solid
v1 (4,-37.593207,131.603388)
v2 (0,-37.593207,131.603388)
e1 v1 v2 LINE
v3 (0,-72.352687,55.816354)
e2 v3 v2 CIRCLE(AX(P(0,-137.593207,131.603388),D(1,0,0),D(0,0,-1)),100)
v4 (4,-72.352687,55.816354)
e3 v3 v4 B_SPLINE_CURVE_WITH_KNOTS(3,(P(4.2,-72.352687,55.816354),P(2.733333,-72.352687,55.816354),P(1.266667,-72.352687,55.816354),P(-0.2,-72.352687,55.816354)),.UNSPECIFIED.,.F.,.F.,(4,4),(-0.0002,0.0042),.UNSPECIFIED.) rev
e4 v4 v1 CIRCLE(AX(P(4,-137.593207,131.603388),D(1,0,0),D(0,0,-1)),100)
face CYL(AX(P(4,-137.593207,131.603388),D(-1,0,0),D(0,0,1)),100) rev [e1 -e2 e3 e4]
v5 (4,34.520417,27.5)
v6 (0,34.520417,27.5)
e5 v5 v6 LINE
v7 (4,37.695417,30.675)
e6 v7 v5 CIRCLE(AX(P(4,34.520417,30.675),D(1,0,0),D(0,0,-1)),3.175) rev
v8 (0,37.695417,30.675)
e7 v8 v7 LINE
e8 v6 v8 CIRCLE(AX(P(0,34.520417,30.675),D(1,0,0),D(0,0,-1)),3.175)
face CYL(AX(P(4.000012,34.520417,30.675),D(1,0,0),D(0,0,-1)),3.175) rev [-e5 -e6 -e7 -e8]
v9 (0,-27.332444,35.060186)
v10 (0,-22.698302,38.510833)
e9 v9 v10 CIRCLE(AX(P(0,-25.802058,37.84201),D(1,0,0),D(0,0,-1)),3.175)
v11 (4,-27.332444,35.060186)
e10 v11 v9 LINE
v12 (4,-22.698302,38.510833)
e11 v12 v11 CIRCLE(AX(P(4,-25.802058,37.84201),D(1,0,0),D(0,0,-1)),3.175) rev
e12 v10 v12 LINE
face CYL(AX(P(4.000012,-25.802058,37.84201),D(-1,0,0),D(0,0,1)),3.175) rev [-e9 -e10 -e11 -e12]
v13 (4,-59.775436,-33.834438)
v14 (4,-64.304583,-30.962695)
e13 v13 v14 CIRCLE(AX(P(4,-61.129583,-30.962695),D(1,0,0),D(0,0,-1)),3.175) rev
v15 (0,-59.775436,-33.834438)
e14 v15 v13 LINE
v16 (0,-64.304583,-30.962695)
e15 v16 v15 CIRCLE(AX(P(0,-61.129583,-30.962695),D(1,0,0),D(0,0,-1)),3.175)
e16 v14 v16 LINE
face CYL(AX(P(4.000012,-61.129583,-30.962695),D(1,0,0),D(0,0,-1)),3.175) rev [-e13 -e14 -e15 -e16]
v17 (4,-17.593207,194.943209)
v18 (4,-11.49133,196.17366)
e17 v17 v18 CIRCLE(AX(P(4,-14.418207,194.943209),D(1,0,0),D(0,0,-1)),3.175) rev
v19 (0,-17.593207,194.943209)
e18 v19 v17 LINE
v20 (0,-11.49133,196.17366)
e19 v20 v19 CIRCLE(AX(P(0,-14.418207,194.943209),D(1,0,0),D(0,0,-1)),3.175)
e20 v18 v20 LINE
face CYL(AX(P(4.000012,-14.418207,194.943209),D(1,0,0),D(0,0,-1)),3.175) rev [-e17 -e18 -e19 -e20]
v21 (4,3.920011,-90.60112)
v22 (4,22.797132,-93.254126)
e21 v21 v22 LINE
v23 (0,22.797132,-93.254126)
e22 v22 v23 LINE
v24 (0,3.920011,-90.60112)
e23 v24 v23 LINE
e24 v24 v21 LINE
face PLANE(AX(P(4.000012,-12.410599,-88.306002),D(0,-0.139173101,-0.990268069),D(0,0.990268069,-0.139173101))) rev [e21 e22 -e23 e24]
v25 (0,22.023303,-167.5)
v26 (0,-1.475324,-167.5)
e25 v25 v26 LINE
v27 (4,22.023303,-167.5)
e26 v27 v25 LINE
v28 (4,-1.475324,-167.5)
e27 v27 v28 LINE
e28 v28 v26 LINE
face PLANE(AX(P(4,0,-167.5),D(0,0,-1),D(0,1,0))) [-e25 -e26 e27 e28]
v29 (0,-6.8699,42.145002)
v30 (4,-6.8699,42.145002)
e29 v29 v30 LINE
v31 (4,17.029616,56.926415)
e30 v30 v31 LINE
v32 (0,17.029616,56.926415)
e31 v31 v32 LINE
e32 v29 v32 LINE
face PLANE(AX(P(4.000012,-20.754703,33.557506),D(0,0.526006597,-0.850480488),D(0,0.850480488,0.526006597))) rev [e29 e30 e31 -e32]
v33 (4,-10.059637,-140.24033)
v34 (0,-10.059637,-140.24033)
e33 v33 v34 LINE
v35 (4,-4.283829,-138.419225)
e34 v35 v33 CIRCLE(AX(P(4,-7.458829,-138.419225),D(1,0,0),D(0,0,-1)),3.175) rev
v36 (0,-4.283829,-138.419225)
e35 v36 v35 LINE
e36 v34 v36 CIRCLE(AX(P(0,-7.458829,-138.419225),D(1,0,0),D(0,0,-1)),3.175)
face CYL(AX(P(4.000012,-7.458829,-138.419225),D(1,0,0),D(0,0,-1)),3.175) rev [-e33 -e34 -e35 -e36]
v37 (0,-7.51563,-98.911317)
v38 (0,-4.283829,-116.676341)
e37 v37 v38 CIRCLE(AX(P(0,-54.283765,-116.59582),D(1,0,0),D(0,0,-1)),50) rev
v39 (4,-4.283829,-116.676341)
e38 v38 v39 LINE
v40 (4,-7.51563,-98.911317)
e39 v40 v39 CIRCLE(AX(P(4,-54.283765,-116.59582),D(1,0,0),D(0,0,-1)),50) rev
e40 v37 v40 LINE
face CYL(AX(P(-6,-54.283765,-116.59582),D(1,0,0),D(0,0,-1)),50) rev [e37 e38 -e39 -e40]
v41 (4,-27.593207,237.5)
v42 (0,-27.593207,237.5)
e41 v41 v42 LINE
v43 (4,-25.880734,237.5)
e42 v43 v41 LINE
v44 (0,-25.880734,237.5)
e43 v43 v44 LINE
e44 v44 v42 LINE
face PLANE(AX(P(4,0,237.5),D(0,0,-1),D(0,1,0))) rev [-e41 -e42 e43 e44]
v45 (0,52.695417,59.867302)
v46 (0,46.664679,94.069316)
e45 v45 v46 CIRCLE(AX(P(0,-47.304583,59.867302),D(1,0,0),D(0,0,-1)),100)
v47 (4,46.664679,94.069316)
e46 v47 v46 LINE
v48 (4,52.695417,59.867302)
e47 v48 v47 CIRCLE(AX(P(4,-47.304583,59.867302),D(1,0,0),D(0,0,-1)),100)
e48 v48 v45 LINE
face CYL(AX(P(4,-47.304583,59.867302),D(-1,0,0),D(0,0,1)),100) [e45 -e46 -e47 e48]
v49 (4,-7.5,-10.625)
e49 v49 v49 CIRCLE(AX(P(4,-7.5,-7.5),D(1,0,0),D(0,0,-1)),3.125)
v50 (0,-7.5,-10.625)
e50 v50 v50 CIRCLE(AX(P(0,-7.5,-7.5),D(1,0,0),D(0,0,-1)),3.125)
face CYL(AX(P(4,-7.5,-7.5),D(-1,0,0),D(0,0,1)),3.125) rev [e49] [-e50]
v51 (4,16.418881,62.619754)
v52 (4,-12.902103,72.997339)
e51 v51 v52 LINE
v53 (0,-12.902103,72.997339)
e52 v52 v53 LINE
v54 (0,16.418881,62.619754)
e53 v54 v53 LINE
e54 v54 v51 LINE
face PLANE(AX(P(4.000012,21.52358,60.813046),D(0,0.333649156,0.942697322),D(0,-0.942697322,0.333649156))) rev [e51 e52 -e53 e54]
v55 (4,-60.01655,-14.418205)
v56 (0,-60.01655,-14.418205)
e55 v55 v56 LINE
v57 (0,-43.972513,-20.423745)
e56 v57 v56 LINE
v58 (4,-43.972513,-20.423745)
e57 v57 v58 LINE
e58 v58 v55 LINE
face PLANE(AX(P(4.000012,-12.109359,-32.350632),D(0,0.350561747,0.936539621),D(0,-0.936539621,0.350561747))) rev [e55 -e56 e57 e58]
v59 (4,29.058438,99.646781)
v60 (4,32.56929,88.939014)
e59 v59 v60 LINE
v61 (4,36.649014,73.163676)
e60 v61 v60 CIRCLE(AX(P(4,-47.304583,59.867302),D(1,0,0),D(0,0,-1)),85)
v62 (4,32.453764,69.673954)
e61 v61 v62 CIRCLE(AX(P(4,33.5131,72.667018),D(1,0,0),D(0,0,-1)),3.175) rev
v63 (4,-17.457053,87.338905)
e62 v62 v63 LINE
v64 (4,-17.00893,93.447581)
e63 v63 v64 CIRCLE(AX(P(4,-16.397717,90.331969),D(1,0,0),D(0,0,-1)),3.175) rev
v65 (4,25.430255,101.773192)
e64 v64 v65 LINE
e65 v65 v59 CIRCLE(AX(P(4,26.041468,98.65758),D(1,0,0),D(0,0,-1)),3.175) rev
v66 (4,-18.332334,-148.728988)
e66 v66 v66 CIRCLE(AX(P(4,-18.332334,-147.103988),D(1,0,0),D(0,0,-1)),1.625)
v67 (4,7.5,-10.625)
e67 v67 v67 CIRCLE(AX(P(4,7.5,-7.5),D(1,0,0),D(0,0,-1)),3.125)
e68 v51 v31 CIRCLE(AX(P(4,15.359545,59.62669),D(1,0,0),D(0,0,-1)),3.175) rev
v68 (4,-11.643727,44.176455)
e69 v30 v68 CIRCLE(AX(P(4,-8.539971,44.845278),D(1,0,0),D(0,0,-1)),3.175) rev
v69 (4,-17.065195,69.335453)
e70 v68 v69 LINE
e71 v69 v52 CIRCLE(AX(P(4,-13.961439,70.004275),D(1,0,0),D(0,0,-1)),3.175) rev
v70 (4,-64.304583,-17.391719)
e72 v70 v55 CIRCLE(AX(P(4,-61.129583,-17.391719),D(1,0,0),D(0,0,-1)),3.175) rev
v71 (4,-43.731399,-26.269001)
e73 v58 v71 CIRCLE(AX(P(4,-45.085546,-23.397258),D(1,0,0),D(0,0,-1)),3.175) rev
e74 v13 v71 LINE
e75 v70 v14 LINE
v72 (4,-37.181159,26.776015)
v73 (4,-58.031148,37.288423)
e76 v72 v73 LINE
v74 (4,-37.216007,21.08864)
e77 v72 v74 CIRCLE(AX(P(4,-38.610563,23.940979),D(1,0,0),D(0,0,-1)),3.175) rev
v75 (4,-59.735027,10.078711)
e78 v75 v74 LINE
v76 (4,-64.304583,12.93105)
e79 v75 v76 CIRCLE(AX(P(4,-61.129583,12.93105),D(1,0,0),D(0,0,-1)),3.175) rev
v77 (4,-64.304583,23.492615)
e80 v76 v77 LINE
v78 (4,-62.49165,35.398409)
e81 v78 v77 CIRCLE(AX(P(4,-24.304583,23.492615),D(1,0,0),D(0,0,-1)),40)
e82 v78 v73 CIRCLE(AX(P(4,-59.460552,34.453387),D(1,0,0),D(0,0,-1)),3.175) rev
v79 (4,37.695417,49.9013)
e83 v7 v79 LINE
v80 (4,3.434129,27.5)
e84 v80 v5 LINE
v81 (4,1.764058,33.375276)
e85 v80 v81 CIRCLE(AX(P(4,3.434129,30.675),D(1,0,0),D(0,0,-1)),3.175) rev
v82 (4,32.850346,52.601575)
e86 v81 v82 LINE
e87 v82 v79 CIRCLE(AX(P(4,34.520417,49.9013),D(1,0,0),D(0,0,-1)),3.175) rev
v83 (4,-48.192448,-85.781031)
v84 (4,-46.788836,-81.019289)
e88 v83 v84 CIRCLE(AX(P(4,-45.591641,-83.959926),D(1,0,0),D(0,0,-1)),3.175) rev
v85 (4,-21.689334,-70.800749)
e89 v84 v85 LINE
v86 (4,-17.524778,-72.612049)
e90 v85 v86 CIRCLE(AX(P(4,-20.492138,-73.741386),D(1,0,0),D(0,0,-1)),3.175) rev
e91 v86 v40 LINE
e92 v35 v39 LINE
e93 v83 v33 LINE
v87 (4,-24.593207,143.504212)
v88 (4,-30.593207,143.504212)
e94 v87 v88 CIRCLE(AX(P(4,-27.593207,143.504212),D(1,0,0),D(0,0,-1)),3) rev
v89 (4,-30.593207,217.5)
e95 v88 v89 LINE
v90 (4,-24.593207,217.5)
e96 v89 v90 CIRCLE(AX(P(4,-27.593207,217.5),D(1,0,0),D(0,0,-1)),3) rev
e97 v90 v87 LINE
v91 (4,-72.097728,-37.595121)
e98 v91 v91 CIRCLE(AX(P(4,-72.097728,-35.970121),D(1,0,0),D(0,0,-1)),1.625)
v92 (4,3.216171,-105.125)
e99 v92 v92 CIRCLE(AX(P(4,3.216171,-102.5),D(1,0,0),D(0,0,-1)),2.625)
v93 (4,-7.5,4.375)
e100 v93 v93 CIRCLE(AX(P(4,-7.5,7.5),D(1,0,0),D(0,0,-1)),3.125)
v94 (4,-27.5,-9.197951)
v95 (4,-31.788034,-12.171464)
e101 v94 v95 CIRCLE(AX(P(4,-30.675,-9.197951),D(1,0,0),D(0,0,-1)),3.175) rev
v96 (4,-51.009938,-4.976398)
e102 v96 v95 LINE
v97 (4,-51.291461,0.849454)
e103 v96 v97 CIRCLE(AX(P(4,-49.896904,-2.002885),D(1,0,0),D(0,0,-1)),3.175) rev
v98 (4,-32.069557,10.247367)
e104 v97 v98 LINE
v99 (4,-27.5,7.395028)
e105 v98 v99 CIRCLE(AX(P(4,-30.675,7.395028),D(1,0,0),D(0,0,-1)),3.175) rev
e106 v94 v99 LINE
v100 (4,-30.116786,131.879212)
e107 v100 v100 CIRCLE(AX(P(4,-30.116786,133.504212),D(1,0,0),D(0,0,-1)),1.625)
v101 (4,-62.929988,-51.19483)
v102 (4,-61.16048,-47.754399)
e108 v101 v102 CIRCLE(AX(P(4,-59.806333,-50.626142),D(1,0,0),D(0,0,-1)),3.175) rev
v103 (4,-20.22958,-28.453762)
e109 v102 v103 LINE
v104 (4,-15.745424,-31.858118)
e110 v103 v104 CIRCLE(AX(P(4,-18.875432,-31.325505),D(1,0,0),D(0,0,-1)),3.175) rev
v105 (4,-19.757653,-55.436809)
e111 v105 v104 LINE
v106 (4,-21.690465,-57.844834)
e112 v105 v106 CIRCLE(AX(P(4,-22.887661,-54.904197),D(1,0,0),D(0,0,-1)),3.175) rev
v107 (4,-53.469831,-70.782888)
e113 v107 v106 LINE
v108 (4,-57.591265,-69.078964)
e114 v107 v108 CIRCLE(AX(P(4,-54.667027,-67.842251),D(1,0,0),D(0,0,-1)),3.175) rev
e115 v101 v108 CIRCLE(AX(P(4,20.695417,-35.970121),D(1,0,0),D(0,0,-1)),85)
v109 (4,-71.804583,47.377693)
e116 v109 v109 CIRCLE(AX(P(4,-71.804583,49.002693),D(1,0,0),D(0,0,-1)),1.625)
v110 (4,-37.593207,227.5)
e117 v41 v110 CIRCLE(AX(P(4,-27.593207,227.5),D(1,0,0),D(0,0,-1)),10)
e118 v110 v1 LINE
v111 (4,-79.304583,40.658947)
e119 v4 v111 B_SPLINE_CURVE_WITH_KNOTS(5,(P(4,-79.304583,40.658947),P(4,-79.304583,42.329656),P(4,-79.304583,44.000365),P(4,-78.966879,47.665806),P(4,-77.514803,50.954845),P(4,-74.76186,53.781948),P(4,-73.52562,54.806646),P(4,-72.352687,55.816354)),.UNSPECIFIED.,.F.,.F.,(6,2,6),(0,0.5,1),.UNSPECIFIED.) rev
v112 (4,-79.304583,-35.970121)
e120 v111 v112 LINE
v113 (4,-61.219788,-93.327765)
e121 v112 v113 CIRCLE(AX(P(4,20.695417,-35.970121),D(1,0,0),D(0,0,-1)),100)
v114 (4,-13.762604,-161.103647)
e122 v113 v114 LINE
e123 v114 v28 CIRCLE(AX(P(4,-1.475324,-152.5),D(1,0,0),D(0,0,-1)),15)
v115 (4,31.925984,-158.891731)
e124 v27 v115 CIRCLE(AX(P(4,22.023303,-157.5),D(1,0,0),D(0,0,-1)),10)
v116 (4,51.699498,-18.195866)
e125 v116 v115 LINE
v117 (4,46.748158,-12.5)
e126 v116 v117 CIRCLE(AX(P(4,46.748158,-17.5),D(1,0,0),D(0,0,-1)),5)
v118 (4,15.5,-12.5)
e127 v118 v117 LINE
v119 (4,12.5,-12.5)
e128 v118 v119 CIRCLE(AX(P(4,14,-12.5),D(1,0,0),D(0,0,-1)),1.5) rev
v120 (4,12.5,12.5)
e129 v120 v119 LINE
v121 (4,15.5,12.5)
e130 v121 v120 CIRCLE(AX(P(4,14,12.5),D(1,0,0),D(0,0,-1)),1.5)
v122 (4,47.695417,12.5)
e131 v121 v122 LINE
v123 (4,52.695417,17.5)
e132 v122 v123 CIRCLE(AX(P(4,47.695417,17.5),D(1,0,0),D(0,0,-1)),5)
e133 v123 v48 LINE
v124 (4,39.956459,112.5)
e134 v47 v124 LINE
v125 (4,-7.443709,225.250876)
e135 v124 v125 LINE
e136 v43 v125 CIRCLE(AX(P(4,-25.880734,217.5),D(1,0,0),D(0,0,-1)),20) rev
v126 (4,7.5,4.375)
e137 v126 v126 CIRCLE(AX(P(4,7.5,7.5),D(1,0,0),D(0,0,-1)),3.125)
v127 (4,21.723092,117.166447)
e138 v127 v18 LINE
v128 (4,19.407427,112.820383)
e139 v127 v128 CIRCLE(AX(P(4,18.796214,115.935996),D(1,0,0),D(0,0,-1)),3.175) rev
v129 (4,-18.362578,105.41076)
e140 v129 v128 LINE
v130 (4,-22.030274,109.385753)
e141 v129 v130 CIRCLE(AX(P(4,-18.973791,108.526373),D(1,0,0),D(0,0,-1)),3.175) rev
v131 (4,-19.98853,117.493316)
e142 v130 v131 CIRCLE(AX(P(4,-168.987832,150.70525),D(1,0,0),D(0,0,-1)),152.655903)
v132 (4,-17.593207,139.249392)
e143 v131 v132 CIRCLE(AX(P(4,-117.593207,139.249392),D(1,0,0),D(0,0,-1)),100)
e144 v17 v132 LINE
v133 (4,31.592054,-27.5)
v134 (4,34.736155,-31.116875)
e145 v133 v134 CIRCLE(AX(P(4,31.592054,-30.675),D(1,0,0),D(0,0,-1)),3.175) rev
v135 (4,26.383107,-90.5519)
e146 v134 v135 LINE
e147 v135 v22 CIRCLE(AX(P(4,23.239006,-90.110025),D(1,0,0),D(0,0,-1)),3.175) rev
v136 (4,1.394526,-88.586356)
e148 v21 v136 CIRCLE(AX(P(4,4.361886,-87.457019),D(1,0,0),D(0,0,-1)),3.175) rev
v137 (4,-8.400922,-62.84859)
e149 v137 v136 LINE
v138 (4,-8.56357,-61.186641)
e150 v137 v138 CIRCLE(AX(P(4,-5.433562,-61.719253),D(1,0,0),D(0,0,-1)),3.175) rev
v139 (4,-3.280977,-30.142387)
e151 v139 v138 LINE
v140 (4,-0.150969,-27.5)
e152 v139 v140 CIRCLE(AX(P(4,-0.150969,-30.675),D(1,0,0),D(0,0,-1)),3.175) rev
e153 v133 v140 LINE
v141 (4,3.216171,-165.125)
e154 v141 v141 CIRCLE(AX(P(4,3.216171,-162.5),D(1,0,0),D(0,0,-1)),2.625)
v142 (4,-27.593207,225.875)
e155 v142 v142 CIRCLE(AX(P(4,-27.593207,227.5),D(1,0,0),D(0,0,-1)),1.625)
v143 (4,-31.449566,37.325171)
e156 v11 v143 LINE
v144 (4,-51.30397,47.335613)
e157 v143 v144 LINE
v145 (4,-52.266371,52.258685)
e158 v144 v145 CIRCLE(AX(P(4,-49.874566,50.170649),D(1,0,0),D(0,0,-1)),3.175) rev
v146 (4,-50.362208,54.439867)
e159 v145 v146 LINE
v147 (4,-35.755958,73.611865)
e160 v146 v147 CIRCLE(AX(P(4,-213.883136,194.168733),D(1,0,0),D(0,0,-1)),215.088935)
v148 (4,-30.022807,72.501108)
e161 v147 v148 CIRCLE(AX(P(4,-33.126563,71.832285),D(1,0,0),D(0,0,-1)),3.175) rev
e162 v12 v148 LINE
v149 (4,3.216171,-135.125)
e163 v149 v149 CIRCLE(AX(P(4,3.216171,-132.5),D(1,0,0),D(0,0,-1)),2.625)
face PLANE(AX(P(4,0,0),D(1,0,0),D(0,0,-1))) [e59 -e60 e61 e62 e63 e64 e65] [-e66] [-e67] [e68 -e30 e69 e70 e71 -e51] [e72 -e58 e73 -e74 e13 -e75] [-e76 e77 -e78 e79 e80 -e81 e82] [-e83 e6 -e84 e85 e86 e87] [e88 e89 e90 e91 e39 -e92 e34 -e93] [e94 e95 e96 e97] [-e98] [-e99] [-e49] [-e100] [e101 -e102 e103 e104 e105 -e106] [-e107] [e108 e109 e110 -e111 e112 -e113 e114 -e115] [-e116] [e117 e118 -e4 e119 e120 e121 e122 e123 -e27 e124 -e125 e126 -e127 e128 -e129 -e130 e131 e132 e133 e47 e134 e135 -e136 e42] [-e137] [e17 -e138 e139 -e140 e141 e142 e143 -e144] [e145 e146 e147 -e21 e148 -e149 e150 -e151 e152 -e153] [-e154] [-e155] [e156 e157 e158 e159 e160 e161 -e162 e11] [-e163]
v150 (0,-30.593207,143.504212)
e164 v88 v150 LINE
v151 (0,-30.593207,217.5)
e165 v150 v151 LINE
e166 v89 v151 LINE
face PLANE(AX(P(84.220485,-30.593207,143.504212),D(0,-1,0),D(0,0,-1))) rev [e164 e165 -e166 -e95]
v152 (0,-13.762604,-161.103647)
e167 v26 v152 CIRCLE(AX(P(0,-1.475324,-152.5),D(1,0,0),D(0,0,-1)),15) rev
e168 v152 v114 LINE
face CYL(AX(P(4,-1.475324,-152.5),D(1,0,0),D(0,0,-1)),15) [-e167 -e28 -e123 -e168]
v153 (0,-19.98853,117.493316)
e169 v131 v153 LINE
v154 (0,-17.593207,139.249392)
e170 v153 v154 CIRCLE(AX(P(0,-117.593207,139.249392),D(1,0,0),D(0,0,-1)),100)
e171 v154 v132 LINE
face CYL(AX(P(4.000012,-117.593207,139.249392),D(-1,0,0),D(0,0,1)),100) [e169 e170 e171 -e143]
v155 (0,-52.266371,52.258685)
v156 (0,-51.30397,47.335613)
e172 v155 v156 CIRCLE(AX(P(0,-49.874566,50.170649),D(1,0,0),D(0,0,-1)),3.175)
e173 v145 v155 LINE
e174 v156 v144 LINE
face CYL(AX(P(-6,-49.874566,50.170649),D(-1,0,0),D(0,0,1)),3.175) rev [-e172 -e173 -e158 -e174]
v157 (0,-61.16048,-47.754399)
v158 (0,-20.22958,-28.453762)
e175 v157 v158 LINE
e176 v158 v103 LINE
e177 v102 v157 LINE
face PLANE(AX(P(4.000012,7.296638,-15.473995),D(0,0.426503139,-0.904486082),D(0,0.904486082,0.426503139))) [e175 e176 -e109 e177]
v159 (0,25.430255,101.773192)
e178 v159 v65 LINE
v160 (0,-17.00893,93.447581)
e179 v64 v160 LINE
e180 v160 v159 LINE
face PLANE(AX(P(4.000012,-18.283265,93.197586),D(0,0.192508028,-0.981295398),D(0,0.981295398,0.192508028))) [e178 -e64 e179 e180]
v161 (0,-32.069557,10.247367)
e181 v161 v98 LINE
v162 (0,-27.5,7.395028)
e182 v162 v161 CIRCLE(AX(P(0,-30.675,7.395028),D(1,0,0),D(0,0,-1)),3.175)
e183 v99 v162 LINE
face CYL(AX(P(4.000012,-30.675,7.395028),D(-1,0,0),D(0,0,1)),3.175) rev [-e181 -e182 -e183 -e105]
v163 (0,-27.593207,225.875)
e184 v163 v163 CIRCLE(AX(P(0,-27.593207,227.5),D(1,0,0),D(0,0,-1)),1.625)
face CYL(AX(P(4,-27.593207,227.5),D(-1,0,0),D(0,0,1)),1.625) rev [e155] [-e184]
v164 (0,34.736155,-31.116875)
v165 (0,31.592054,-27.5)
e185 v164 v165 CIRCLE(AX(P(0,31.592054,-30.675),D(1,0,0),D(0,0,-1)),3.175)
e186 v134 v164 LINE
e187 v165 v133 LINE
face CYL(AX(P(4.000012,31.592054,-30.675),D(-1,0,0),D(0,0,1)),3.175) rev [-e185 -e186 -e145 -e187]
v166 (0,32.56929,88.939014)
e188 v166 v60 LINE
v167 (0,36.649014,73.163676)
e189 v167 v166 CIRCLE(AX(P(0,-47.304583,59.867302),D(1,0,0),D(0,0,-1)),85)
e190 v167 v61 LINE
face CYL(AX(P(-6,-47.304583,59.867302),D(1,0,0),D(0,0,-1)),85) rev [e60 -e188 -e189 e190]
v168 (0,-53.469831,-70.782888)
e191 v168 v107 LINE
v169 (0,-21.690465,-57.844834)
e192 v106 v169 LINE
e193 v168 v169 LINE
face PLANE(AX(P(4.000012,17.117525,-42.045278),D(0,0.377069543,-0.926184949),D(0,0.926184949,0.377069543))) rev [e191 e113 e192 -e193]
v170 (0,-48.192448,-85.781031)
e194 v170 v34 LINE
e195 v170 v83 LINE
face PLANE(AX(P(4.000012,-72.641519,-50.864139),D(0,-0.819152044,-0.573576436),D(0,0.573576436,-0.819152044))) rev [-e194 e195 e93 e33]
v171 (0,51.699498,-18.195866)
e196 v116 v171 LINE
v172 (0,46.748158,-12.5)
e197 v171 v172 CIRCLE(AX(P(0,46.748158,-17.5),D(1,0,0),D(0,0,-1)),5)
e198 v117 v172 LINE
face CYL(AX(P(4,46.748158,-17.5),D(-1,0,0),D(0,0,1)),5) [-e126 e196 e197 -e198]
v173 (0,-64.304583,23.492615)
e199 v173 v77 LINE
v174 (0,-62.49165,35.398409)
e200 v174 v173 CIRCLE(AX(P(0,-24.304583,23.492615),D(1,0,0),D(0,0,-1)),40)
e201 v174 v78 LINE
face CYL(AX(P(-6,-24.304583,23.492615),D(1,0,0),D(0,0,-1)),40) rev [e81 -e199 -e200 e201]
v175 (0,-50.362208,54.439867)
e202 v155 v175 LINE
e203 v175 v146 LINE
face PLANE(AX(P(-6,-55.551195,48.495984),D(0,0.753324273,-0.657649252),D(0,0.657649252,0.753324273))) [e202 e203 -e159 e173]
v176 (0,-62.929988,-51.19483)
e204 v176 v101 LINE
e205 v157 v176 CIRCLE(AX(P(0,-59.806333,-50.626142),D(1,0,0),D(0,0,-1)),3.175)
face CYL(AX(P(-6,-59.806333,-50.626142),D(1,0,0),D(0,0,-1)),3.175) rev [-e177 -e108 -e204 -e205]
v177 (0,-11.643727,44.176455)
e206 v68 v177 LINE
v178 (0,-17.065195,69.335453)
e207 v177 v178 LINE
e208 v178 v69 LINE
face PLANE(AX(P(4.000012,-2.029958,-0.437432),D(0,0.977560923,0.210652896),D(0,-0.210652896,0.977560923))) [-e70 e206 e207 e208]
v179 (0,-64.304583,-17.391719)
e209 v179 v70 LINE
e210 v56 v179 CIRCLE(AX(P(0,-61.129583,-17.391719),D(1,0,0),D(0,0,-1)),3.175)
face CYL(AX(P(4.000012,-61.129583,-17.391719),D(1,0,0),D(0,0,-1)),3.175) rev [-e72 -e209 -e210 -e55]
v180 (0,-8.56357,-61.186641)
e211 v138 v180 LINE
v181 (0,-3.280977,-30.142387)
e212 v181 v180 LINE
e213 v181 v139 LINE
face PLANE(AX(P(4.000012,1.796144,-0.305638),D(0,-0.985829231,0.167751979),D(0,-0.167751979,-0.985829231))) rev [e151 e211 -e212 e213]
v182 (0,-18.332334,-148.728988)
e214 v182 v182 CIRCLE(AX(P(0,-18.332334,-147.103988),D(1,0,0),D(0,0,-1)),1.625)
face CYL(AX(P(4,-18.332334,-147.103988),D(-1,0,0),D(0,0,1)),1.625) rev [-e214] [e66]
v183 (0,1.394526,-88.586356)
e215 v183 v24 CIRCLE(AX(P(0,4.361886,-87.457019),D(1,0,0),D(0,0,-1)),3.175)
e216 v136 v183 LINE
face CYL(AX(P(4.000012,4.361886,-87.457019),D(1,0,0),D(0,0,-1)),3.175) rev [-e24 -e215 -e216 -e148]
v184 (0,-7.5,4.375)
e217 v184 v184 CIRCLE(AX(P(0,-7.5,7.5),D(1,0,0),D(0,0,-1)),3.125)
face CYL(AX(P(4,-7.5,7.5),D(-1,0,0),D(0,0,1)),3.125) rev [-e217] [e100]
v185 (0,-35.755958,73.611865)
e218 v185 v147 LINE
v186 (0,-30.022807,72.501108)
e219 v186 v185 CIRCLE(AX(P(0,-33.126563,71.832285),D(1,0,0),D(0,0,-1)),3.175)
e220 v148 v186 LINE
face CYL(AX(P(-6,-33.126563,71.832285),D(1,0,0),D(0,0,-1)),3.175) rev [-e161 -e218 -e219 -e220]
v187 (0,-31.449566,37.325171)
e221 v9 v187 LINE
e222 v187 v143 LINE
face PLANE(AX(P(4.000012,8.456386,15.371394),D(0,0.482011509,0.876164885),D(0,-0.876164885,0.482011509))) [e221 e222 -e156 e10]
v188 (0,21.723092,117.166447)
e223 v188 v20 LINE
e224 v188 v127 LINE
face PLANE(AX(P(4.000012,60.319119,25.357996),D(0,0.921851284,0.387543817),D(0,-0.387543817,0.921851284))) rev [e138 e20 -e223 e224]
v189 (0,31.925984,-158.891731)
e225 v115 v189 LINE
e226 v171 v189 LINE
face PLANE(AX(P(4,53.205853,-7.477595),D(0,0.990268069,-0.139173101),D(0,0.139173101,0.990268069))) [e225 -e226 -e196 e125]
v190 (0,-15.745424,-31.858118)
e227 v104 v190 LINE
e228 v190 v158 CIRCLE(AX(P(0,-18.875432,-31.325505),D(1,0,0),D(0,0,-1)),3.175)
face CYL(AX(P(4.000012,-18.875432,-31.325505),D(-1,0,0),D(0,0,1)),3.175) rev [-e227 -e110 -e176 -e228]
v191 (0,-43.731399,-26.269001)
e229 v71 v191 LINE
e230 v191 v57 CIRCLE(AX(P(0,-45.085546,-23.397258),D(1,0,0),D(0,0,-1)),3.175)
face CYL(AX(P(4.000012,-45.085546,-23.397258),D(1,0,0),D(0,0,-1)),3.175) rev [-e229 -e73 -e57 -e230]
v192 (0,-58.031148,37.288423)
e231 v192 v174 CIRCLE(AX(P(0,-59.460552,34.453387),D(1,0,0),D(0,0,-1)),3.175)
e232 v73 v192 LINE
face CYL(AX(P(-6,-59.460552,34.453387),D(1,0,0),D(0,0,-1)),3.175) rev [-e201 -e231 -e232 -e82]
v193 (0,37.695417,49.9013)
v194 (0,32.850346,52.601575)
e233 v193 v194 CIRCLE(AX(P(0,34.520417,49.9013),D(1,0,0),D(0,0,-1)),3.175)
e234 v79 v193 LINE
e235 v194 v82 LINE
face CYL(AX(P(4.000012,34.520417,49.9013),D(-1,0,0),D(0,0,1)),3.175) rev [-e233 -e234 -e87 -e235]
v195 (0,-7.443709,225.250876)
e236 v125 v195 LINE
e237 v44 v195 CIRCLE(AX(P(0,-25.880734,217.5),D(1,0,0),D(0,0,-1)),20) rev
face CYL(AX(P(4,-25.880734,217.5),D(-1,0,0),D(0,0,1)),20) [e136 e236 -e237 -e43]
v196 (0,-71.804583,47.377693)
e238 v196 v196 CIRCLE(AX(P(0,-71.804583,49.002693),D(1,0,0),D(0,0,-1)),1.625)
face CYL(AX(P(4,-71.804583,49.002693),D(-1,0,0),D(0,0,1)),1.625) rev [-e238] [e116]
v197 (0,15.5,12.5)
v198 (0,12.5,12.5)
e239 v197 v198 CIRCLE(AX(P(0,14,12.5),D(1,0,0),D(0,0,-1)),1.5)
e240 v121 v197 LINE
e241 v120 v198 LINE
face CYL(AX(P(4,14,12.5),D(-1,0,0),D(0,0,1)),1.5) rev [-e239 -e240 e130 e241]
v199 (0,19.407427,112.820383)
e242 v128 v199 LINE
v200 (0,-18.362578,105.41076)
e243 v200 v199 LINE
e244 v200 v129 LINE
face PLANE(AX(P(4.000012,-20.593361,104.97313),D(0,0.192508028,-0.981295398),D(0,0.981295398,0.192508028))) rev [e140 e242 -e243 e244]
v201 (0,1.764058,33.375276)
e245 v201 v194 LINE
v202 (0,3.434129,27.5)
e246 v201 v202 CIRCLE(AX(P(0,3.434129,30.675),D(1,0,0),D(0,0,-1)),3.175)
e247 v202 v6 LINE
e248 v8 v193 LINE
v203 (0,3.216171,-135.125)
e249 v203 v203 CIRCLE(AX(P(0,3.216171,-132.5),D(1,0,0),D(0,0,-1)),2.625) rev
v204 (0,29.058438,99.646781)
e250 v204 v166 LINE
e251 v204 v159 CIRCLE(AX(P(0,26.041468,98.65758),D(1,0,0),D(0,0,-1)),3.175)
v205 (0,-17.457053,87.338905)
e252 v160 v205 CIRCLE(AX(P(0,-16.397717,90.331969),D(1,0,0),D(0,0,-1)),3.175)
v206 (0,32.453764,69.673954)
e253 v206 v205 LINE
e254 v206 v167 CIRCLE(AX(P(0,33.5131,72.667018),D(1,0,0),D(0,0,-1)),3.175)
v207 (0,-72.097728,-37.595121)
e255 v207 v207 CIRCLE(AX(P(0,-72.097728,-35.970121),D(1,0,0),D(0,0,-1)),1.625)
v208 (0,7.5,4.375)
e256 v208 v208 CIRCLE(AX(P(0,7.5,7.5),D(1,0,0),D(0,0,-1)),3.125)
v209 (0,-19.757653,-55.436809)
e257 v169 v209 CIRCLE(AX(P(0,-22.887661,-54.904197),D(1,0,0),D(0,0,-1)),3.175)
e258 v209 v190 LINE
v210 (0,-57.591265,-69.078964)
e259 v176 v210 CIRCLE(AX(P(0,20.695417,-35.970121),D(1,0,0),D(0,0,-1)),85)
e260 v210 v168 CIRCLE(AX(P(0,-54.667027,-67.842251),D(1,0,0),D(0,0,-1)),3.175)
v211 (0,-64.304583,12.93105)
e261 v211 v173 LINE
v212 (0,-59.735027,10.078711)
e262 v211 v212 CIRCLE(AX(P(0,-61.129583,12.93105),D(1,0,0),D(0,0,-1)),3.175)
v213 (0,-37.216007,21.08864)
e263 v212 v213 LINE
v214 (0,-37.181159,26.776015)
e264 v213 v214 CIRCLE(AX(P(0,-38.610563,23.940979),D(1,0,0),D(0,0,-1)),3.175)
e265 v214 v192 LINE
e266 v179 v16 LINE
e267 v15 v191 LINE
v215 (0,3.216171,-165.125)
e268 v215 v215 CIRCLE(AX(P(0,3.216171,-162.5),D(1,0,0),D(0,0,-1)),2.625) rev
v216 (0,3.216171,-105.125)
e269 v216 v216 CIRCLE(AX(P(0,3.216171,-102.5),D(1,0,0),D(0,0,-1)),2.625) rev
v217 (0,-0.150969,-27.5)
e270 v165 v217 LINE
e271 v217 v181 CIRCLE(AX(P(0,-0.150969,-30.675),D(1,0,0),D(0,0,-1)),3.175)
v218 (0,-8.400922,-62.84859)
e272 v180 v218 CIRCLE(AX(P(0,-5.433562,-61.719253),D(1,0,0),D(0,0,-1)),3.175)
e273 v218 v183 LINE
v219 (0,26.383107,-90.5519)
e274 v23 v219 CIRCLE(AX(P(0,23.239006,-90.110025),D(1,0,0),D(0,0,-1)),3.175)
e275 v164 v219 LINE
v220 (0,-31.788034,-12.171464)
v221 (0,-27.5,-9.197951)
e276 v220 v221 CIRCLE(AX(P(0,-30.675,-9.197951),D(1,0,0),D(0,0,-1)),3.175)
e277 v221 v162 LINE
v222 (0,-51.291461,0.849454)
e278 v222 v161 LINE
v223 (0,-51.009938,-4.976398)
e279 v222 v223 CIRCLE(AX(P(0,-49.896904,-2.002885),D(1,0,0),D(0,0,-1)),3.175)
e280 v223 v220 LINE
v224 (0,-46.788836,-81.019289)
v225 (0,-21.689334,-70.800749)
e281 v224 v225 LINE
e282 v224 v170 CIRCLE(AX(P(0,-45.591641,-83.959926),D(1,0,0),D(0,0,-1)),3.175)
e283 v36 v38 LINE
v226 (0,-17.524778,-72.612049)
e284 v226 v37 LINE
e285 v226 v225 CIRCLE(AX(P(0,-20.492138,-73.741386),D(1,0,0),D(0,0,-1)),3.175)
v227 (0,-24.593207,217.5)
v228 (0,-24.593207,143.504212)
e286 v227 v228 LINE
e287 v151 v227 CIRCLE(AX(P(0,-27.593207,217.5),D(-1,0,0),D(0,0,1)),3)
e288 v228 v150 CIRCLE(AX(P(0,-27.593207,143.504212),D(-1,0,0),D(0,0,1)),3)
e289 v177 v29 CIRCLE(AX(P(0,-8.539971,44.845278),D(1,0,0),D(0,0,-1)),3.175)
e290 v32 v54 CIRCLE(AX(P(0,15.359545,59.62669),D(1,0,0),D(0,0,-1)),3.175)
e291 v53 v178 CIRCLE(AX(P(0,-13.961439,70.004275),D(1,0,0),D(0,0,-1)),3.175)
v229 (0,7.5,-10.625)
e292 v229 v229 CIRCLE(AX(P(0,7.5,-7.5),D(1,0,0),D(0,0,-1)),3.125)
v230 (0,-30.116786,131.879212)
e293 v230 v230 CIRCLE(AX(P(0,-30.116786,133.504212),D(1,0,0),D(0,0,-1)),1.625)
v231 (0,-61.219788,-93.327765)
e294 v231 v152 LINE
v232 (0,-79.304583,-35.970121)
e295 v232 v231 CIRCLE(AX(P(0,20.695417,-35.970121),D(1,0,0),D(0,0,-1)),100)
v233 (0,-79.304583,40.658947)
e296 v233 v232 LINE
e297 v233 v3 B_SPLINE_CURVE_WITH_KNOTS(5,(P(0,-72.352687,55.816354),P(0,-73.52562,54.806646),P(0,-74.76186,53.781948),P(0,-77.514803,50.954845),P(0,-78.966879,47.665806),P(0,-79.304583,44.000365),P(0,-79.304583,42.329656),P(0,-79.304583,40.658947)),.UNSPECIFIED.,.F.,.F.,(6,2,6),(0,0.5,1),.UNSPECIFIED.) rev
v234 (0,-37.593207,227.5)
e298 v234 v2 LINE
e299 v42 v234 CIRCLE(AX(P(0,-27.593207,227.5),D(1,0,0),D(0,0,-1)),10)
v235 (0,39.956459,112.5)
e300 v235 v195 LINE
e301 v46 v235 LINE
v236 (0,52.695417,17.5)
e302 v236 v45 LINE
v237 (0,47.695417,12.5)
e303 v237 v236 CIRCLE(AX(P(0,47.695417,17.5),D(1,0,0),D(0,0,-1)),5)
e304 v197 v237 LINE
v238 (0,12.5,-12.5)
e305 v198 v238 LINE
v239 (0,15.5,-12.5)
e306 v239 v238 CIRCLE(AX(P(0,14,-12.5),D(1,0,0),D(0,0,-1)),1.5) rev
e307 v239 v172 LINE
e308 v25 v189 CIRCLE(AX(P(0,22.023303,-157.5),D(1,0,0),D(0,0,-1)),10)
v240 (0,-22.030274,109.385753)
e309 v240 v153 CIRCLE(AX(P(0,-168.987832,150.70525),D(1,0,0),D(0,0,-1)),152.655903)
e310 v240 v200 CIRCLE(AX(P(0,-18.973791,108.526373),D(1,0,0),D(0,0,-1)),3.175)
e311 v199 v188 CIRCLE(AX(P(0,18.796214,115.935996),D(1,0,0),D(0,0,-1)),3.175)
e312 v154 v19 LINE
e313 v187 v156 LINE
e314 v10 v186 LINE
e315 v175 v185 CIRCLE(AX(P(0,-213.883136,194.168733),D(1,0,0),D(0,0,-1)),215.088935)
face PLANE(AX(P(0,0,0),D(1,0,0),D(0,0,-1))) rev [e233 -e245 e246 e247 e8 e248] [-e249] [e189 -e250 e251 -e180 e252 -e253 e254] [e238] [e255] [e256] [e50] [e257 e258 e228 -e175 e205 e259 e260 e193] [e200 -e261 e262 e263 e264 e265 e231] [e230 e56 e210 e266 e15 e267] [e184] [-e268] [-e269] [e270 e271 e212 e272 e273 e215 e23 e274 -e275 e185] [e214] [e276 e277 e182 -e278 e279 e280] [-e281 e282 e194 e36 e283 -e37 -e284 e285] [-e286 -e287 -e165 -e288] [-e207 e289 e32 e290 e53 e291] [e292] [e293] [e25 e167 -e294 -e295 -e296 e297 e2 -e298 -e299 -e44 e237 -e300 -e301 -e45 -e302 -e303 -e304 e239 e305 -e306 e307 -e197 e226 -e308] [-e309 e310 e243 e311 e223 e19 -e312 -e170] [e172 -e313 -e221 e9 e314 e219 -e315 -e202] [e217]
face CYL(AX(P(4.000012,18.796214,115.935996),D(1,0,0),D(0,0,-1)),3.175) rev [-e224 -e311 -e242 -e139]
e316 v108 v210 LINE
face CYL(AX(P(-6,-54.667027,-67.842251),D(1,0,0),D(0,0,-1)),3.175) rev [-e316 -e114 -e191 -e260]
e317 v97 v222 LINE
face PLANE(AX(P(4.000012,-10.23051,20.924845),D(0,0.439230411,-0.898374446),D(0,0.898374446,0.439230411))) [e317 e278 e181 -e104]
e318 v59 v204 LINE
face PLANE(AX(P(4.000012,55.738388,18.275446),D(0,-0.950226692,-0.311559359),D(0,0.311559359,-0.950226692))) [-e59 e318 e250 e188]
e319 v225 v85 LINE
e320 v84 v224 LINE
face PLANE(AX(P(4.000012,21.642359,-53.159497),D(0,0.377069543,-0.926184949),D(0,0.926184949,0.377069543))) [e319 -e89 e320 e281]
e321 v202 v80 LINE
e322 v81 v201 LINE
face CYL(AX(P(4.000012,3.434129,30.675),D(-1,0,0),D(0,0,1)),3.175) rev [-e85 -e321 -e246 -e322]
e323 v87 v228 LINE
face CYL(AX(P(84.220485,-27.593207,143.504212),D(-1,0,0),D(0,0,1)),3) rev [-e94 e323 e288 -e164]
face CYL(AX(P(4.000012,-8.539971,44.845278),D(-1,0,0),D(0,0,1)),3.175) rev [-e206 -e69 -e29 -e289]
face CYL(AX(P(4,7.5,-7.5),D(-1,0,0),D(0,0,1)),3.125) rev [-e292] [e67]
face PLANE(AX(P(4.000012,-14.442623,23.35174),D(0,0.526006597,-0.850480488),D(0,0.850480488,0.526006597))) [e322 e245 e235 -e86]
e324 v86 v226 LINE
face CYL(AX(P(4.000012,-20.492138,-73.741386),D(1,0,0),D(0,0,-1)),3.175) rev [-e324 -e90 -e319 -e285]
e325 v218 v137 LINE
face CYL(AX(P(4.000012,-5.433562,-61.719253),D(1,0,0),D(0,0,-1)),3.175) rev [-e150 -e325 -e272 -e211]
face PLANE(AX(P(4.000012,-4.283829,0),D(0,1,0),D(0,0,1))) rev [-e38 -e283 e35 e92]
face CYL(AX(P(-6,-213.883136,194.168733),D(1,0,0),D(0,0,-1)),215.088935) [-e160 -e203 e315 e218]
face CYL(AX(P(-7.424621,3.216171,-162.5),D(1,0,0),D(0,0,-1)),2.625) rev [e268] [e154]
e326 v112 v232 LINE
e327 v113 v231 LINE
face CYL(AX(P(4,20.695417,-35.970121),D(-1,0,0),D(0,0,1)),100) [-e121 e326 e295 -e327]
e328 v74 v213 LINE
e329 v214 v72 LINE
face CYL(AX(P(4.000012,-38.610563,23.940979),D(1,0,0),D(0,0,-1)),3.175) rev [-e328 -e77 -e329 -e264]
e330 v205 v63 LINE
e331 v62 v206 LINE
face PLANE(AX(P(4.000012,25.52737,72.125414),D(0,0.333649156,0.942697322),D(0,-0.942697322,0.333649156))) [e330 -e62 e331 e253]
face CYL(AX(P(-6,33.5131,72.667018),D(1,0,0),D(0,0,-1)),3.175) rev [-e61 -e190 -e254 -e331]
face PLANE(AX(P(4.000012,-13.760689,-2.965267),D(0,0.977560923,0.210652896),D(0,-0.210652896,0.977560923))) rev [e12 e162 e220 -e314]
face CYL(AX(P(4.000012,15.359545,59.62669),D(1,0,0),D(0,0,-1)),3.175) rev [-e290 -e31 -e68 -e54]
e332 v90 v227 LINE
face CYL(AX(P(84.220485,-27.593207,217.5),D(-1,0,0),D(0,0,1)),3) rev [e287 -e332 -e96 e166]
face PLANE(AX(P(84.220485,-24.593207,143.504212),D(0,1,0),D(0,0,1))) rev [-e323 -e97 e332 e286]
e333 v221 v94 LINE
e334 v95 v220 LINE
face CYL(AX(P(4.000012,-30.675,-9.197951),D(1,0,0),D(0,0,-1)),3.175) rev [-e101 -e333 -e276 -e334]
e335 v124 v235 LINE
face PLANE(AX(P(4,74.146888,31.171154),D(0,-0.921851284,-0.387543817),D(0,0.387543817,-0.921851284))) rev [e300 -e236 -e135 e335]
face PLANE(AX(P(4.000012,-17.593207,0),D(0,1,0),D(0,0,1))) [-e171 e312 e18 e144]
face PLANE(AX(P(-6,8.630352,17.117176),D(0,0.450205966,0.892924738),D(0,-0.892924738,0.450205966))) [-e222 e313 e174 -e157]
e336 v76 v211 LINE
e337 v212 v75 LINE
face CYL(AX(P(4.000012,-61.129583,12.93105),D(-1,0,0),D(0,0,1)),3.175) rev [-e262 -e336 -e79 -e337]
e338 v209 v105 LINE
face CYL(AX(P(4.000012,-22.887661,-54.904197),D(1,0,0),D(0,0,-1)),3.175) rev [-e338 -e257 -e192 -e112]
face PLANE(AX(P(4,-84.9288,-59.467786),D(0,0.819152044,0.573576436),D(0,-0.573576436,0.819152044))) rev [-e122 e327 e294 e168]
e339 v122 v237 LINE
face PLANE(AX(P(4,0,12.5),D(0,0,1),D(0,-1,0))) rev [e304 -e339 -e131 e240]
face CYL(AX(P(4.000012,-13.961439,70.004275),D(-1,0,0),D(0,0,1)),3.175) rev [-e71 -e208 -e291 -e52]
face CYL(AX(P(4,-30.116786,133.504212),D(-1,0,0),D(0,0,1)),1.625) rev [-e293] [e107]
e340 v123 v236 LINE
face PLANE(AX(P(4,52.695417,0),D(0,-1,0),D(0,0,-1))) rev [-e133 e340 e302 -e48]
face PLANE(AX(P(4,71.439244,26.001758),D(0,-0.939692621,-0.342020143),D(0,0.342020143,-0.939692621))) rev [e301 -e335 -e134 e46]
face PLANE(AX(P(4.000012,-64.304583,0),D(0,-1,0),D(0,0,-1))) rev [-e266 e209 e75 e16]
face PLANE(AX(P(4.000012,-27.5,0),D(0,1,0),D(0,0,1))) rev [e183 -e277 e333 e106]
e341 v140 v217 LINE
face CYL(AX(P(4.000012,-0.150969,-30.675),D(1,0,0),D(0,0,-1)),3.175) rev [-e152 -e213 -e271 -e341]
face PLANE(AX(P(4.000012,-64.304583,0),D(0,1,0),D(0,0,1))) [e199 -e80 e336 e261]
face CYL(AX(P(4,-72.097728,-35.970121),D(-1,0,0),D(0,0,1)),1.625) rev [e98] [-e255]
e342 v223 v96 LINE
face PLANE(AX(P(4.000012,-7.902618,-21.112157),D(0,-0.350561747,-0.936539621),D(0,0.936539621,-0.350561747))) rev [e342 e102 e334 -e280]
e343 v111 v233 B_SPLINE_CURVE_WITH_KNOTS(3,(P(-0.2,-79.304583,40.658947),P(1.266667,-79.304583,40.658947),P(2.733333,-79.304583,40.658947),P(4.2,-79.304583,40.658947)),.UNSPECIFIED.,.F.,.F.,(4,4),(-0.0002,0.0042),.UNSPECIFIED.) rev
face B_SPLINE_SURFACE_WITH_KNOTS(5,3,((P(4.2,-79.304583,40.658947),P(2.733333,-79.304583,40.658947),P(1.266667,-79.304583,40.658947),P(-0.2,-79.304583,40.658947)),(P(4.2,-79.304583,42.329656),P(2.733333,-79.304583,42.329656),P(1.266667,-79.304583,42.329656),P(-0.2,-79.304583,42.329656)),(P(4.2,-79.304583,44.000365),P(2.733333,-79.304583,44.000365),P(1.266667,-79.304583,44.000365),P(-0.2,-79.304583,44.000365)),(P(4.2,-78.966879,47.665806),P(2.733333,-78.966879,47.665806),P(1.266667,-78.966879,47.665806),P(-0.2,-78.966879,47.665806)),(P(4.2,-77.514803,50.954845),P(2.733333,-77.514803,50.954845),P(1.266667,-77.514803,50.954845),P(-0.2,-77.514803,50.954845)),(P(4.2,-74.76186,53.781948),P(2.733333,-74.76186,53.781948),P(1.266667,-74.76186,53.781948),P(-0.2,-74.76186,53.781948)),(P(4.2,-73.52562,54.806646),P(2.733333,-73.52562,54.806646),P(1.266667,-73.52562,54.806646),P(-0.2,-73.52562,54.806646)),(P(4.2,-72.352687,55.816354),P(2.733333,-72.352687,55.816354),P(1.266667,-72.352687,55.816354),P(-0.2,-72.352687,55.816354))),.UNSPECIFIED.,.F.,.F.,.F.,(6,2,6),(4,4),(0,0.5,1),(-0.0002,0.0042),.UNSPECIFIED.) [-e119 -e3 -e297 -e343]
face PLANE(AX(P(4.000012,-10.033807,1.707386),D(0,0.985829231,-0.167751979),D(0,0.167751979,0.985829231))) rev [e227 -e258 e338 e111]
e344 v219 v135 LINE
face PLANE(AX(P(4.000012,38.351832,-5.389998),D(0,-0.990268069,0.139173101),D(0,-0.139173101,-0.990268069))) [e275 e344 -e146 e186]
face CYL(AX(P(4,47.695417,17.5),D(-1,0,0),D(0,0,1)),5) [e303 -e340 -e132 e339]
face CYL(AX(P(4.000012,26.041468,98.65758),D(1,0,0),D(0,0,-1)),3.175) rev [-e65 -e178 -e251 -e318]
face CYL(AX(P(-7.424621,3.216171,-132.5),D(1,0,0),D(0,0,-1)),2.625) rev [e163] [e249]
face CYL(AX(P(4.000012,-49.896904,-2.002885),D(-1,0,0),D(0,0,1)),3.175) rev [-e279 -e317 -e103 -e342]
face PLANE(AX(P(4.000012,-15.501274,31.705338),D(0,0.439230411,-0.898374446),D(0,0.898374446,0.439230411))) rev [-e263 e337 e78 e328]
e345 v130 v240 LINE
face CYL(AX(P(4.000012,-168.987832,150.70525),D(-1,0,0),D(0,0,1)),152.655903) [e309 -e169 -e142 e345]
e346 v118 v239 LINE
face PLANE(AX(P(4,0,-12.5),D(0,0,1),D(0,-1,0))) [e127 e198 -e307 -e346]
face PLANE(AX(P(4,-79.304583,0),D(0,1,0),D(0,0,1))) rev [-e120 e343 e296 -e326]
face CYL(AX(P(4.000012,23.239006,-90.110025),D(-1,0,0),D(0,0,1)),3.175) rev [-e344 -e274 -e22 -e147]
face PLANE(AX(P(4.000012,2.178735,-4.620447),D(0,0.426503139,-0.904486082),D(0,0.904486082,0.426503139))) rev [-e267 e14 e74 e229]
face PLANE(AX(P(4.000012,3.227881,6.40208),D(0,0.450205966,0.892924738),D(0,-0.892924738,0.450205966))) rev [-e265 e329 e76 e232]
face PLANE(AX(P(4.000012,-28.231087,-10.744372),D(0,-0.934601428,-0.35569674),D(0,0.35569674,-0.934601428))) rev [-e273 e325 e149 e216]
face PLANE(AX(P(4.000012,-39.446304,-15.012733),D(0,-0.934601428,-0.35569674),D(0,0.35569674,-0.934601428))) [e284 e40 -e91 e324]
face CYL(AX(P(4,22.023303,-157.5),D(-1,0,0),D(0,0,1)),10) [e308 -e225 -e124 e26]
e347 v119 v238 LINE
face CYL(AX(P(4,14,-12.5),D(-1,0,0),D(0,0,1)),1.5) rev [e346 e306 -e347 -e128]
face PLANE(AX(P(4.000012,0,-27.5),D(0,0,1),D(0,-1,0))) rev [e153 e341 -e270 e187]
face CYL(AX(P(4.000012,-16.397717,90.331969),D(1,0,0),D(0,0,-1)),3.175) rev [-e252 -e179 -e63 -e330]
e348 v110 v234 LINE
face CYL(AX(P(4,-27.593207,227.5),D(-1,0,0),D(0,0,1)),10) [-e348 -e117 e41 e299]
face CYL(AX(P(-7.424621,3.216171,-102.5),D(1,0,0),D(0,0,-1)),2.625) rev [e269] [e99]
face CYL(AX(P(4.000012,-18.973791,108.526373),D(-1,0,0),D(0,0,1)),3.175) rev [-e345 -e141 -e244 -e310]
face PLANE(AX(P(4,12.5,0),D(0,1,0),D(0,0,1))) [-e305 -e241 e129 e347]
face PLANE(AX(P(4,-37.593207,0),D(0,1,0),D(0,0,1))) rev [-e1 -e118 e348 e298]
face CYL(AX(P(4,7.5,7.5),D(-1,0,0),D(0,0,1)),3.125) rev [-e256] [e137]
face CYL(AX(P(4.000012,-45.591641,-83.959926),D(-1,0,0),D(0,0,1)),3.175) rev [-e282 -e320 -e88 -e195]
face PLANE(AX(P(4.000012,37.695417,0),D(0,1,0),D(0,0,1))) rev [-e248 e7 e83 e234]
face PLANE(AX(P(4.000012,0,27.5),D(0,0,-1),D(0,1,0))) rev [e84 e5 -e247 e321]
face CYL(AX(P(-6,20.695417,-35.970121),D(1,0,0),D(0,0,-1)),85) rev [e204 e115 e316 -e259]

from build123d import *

# Parameters (mm, degrees)
SKETCH2_R               = 3.125
SKETCH2_R_2             = 1.625
BOSS_EXTRUDE1_DEPTH     = 4
SKETCH4_R               = 2.625
CUT_EXTRUDE1_DEPTH      = 4
CUT_EXTRUDE2_DEPTH      = 4
CUT_EXTRUDE3_DEPTH      = 251.422576691
CUT_EXTRUDE3_DEPTH_BACK = 10
FILLET1_START           = -1
FILLET1_DEPTH           = 6
FILLET2_R               = 15
FILLET3_R               = 3.175


with BuildPart() as part:
    # Sketch2 → Boss-Extrude1 (new body)
    with BuildSketch(Plane(origin=(0, 0, 0), x_dir=(0, 0, -1), z_dir=(1, 0, 0))):
        with BuildLine():
            Line((-12.5, 12.5), (12.5, 12.5))
            ThreePointArc((12.5, 12.5), (14, 14), (12.5, 15.5))
            Line((12.5, 15.5), (12.5, 46.748157964))
            ThreePointArc((12.5, 46.748157964), (14.219704855, 50.521705865), (18.195865505, 51.699498308))
            Line((18.195865505, 51.699498308), (158.89173101, 31.92598393))
            ThreePointArc((158.89173101, 31.92598393), (165.047095802, 28.583893533), (167.5, 22.023303243))
            Line((167.5, 22.023303243), (167.5, -9.283829379))
            Line((167.5, -9.283829379), (93.327764747, -61.219787629))
            ThreePointArc((93.327764747, -61.219787629), (66.040701063, -74.676278275), (35.970121112, -79.3045832))
            Line((35.970121112, -79.3045832), (-50.348010792, -79.3045832))
            ThreePointArc((-50.348010792, -79.3045832), (-85.935359672, -48.630118411), (-131.603387734, -37.593207459))
            Line((-131.603387734, -37.593207459), (-227.5, -37.593207459))
            ThreePointArc((-227.5, -37.593207459), (-234.571067812, -34.664275271), (-237.5, -27.593207459))
            Line((-237.5, -27.593207459), (-237.5, -25.880734277))
            ThreePointArc((-237.5, -25.880734277), (-234.158594281, -14.813158364), (-225.250876341, -7.443708597))
            Line((-225.250876341, -7.443708597), (-112.5, 39.956458601))
            Line((-112.5, 39.956458601), (-94.069316262, 46.664678879))
            ThreePointArc((-94.069316262, 46.664678879), (-77.232119696, 51.176192101), (-59.867301929, 52.6954168))
            Line((-59.867301929, 52.6954168), (-17.5, 52.6954168))
            ThreePointArc((-17.5, 52.6954168), (-13.964466094, 51.230950706), (-12.5, 47.6954168))
            Line((-12.5, 47.6954168), (-12.5, 15.5))
            ThreePointArc((-12.5, 15.5), (-14, 14), (-12.5, 12.5))
        make_face()
        with Locations((-7.5, 7.5)):
            Circle(SKETCH2_R, mode=Mode.SUBTRACT)
        with Locations((7.5, 7.5)):
            Circle(SKETCH2_R, mode=Mode.SUBTRACT)
        with Locations((7.5, -7.5)):
            Circle(SKETCH2_R, mode=Mode.SUBTRACT)
        with Locations((-7.5, -7.5)):
            Circle(SKETCH2_R, mode=Mode.SUBTRACT)
        with Locations((-227.5, -27.593207459)):
            Circle(SKETCH2_R_2, mode=Mode.SUBTRACT)
        with Locations((-133.504211585, -30.116786314)):
            Circle(SKETCH2_R_2, mode=Mode.SUBTRACT)
        with Locations((-49.002692564, -71.8045832)):
            Circle(SKETCH2_R_2, mode=Mode.SUBTRACT)
        with Locations((35.970121112, -72.097727652)):
            Circle(SKETCH2_R_2, mode=Mode.SUBTRACT)
        with Locations((147.103987767, -18.332333959)):
            Circle(SKETCH2_R_2, mode=Mode.SUBTRACT)
    extrude(amount=BOSS_EXTRUDE1_DEPTH)

    # Sketch4 → Cut-Extrude1 (cut)
    with BuildSketch(Plane(origin=(4, 0, 0), x_dir=(0, 0, -1), z_dir=(1, 0, 0))):
        with Locations((102.5, 3.216170621)):
            Circle(SKETCH4_R)
        with Locations((162.5, 3.216170621)):
            Circle(SKETCH4_R)
        with Locations((132.5, 3.216170621)):
            Circle(SKETCH4_R)
    extrude(amount=-CUT_EXTRUDE1_DEPTH, mode=Mode.SUBTRACT)

    # Sketch7 → Cut-Extrude2 (cut)
    with BuildSketch(Plane.ZY):
        with BuildLine():
            Line((143.504211585, -24.593207459), (217.5, -24.593207459))
            ThreePointArc((217.5, -24.593207459), (220.5, -27.593207459), (217.5, -30.593207459))
            Line((217.5, -30.593207459), (143.504211585, -30.593207459))
            ThreePointArc((143.504211585, -30.593207459), (140.504211585, -27.593207459), (143.504211585, -24.593207459))
        make_face()
    extrude(amount=-CUT_EXTRUDE2_DEPTH, mode=Mode.SUBTRACT)

    # Sketch8 → Cut-Extrude3 (cut, two sides: drawn at the far end of the back side and taken through both)
    with BuildSketch(Plane(origin=(4, 0, 0), x_dir=(0, 0, -1), z_dir=(1, 0, 0)).offset(-CUT_EXTRUDE3_DEPTH_BACK)):
        with BuildLine():
            Line((-113.57117516, 23.234534385), (-210.688209636, -17.593207459))
            Line((-210.688209636, -17.593207459), (-139.249392001, -17.593207459))
            ThreePointArc((-139.249392001, -17.593207459), (-128.305621954, -18.193841781), (-117.493315985, -19.988529516))
            ThreePointArc((-117.493315985, -19.988529516), (-110.906374998, -21.611191224), (-104.398029564, -23.524895038))
            Line((-104.398029564, -23.524895038), (-113.57117516, 23.234534385))
        make_face()
        with BuildLine():
            ThreePointArc((-38.896111202, -61.219787629), (-31.347289926, -63.525803076), (-23.492615431, -64.3045832))
            Line((-23.492615431, -64.3045832), (-7.844578132, -64.3045832))
            Line((-7.844578132, -64.3045832), (-23.897236503, -31.471478495))
            Line((-23.897236503, -31.471478495), (-38.896111202, -61.219787629))
        make_face()
        with BuildLine():
            Line((82.520271866, -50.475656782), (148.489038099, -4.283829379))
            Line((148.489038099, -4.283829379), (116.676340901, -4.283829379))
            ThreePointArc((116.676340901, -4.283829379), (107.646731671, -5.091144924), (98.911316911, -7.515630477))
            Line((98.911316911, -7.515630477), (69.575731894, -18.680359782))
            Line((69.575731894, -18.680359782), (82.520271866, -50.475656782))
        make_face()
        Polygon((90.339984209, 2.061933427), (93.696000857, 25.941232677), (27.5, 35.244473892), (27.5, -2.831339099), (62.03978176, -8.708743191), align=None)
        Polygon((-27.5, -7.735456644), (-27.5, 37.6954168), (-55.598162704, 37.6954168), align=None)
        with BuildLine():
            Line((-88.939014112, 32.569289567), (-102.31343439, 28.184098276))
            Line((-102.31343439, 28.184098276), (-91.212566173, -28.401754251))
            Line((-91.212566173, -28.401754251), (-67.955274479, 37.309745965))
            ThreePointArc((-67.955274479, 37.309745965), (-78.597719011, 35.60604022), (-88.939014112, 32.569289567))
        make_face()
        Polygon((13.776543649, -27.5), (-12.481500104, -27.5), (2.390501596, -57.918263299), align=None)
        Polygon((-74.89478187, -18.263165558), (-39.778603589, -10.696041624), (-60.41005824, 22.662189485), align=None)
        with BuildLine():
            Line((-49.181599521, -54.965243604), (-37.325171166, -31.449566394))
            Line((-37.325171166, -31.449566394), (-31.703807854, -21.231467759))
            Line((-31.703807854, -21.231467759), (-79.948761535, -31.627688578))
            ThreePointArc((-79.948761535, -31.627688578), (-66.849258357, -40.525120988), (-54.439866562, -50.362208069))
            Line((-54.439866562, -50.362208069), (-50.683815172, -53.641226781))
            ThreePointArc((-50.683815172, -53.641226781), (-49.940993749, -54.312636858), (-49.181599521, -54.965243604))
        make_face()
        Polygon((23.060748964, -36.927651205), (12.81312582, -64.3045832), (35.970121112, -64.3045832), align=None)
        with BuildLine():
            Line((25.857837049, -14.724396782), (48.779257286, -63.333899694))
            ThreePointArc((48.779257286, -63.333899694), (60.611766088, -60.654379345), (71.942273955, -56.317596515))
            Line((71.942273955, -56.317596515), (57.178612381, -20.054044039))
            Line((57.178612381, -20.054044039), (25.857837049, -14.724396782))
        make_face()
    extrude(amount=CUT_EXTRUDE3_DEPTH + CUT_EXTRUDE3_DEPTH_BACK, mode=Mode.SUBTRACT)

    # Fillet1: read off the stored shape, not the designer's step
    # Fillet1 outline → Fillet1 (cut)
    with BuildSketch(Plane.YZ.offset(FILLET1_START)):
        with BuildLine():
            Line((-79.3045832, 50.348010792), (-79.3045832, 40.658946938))
            add(Edge.make_bspline(
                [(-79.3045832, 40.658946938), (-79.3045832, 42.329655762), (-79.3045832, 44.000364586), (-78.966879258, 47.665805706), (-77.514803195, 50.954845241), (-74.76186007, 53.781947885), (-73.525620436, 54.806645775), (-72.352687243, 55.816353737)],
                knots=[0, 0, 0, 0, 0, 0, 0.5, 0.5, 1, 1, 1, 1, 1, 1], degree=5))
            ThreePointArc((-72.352687243, 55.816353737), (-75.76814719, 53.005283923), (-79.3045832, 50.348010792))
        make_face()
    extrude(amount=FILLET1_DEPTH, mode=Mode.SUBTRACT)

    # Fillet2
    fillet2_edges = [part.edges().sort_by_distance(p)[0] for p in [
        (2, -9.283829379, -167.5),
    ]]
    fillet(fillet2_edges, radius=FILLET2_R)

    # Fillet3
    fillet3_edges = [part.edges().sort_by_distance(p)[0] for p in [
        (2, -17.593207459, 210.688209636),
        (2, 37.309745965, 67.955274479),
        (2, -7.735456644, 27.5),
        (2, 37.6954168, 55.598162704),
        (2, 37.6954168, 27.5),
        (2, -18.263165558, 74.89478187),
        (2, -31.627688578, 79.948761535),
        (2, -21.231467759, 31.703807854),
        (2, -54.965243604, 49.181599521),
        (2, -61.219787629, 38.896111202),
        (2, -64.3045832, 7.844578132),
        (2, -31.471478495, 23.897236503),
        (2, -57.918263299, -2.390501596),
        (2, -27.5, -13.776543649),
        (2, -27.5, 12.481500104),
        (2, -64.3045832, -12.81312582),
        (2, -36.927651205, -23.060748964),
        (2, -64.3045832, -35.970121112),
        (2, -14.724396782, -25.857837049),
        (2, -20.054044039, -57.178612381),
        (2, -63.333899694, -48.779257286),
        (2, -56.317596515, -71.942273955),
        (2, -50.475656782, -82.520271866),
        (2, -4.283829379, -148.489038099),
        (2, -18.680359782, -69.575731894),
        (2, -2.831339099, -27.5),
        (2, -8.708743191, -62.03978176),
        (2, 2.061933427, -90.339984209),
        (2, 25.941232677, -93.696000857),
        (2, 35.244473892, -27.5),
        (2, -10.696041624, 39.778603589),
        (2, -28.401754251, 91.212566173),
        (2, 28.184098276, 102.31343439),
        (2, 22.662189485, 60.41005824),
        (2, -23.524895038, 104.398029564),
        (2, 23.234534385, 113.57117516),
    ]]
    fillet(fillet3_edges, radius=FILLET3_R)


solid = part.part
